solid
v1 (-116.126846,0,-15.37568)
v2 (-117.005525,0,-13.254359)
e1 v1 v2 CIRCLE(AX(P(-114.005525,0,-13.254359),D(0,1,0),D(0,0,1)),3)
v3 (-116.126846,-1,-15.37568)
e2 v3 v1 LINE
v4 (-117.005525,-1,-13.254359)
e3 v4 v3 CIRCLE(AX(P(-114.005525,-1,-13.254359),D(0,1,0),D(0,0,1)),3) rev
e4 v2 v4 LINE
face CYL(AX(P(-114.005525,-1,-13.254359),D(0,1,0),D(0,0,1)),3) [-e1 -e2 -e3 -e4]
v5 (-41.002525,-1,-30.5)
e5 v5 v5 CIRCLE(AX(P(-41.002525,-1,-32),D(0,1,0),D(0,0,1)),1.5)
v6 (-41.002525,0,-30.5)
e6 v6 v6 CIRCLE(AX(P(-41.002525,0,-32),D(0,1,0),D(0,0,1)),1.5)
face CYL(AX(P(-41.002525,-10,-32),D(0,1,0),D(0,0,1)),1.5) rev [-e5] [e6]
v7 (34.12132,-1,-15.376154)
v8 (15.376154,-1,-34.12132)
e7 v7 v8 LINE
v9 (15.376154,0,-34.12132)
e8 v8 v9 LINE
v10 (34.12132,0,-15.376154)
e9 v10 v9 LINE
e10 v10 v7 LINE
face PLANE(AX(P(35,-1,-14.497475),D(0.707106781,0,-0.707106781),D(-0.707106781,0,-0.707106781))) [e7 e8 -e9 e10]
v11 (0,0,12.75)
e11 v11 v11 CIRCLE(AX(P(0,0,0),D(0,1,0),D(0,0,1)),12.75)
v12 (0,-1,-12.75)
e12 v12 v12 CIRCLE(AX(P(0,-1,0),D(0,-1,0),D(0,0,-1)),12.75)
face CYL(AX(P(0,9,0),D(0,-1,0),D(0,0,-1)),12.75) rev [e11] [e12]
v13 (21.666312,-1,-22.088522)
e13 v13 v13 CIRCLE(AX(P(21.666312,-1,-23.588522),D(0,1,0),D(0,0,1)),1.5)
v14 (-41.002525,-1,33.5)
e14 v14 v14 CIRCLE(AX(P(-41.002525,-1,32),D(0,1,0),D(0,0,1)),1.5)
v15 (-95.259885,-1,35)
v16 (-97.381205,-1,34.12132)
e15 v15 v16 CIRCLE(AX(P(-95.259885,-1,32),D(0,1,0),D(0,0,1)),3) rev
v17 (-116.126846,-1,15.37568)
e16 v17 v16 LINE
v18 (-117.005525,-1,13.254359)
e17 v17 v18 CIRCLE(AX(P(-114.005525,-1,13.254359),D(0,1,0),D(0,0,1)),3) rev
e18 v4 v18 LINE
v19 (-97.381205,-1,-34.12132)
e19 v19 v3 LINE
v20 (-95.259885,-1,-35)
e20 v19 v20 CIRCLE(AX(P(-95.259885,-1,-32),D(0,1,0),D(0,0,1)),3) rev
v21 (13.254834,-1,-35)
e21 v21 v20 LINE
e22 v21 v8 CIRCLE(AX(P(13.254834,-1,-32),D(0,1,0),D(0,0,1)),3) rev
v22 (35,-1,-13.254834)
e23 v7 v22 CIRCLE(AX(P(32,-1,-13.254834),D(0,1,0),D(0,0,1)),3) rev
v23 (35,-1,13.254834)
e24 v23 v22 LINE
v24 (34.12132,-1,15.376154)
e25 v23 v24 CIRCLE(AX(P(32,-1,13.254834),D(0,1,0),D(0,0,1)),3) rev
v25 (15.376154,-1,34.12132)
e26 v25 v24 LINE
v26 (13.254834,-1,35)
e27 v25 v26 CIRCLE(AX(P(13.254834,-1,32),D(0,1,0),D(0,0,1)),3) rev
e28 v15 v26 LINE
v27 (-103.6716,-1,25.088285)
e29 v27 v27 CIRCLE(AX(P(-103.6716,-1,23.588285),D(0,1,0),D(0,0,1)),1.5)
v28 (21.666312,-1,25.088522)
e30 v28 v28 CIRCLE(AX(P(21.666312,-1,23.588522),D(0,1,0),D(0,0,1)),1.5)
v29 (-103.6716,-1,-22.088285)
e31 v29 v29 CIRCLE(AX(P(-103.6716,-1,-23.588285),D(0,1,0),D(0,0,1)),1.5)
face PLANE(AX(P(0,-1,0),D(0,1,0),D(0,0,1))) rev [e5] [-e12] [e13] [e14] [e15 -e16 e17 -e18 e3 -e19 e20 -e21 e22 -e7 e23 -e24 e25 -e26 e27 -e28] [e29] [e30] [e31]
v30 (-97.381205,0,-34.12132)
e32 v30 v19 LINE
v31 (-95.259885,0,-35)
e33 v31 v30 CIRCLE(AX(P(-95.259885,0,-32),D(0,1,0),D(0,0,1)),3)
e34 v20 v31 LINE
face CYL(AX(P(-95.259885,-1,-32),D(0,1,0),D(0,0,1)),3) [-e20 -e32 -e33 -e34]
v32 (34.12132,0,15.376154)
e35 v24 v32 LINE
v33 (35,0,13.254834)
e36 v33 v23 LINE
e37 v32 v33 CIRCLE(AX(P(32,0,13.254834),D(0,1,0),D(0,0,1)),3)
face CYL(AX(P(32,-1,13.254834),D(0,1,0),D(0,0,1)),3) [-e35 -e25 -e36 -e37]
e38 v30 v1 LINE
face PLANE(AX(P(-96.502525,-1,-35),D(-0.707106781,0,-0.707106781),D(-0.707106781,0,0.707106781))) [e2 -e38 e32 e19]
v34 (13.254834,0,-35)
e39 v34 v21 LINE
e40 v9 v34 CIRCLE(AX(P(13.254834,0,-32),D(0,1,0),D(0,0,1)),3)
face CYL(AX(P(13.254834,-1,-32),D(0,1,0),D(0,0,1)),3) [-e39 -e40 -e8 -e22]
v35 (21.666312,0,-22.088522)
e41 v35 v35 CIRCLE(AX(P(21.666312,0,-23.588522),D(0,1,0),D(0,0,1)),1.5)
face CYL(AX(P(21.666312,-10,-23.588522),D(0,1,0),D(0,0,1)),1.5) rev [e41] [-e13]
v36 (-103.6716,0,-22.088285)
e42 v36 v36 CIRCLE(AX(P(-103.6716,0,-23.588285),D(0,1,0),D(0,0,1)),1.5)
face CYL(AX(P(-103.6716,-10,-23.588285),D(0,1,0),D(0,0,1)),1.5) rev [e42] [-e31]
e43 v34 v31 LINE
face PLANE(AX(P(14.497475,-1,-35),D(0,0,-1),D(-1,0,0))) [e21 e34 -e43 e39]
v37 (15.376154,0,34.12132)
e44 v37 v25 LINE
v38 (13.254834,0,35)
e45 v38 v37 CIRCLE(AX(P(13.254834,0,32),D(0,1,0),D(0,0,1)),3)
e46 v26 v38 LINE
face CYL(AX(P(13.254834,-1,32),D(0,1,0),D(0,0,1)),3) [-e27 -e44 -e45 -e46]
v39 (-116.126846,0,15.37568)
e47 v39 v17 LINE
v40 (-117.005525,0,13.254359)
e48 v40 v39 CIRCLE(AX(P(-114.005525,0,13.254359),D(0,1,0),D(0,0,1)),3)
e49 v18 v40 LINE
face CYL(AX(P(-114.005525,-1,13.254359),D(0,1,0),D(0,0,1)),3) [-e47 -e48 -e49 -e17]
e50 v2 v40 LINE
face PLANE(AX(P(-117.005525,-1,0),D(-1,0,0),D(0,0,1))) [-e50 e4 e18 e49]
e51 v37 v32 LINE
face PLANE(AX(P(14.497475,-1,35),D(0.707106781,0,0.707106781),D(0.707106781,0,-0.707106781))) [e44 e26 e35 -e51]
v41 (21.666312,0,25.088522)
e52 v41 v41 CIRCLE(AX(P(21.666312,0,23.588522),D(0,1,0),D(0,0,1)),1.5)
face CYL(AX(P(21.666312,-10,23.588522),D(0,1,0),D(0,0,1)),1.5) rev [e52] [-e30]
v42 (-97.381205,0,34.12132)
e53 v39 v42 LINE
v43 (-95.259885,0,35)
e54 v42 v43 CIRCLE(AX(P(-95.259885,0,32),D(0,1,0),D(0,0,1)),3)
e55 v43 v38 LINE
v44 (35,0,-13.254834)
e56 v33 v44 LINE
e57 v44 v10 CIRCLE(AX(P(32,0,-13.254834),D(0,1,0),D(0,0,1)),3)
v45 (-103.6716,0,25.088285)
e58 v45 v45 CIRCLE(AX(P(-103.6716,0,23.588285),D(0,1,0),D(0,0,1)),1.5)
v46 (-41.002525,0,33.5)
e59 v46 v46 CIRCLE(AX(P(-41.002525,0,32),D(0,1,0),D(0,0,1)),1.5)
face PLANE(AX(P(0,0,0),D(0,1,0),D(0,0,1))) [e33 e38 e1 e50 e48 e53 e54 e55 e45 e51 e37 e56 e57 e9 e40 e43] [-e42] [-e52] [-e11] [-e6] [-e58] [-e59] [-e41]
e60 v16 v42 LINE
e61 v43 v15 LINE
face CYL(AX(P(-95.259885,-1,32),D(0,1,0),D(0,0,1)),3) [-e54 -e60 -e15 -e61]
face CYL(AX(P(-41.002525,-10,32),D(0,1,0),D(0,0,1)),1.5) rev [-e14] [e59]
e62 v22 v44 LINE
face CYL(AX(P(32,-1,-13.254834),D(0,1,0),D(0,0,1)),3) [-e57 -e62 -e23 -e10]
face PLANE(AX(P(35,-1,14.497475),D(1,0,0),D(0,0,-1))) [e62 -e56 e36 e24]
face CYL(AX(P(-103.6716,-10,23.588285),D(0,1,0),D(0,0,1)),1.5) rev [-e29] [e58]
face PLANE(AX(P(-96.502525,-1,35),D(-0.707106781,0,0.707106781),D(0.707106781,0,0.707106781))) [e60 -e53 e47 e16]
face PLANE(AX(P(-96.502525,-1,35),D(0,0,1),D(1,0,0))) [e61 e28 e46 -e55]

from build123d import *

# Parameters (mm, degrees)
SM_BASE_FLANGE_1_DEPTH = 1
SKETCH_2_R             = 1.5
CUT_EXTRUDE_1_DEPTH    = 10
FILLET_1_R             = 3
SKETCH_3_R             = 12.75
CUT_EXTRUDE_2_DEPTH    = 10


# Sheet-metal steps are written as plain solids
with BuildPart() as part:
    # Sketch 1 → Базовая кромка1 (new body)
    with BuildSketch(Plane(origin=(0, 0, 0), x_dir=(1, 0, 0), z_dir=(0, 1, 0))):
        Polygon((-96.502525317, -35), (14.497474683, -35), (35, -14.497474683), (35, 14.497474683), (14.497474683, 35), (-96.502525317, 35), (-117.005525317, 14.497), (-117.005525317, 0), (-117.005525317, -14.497), align=None)
    extrude(amount=-SM_BASE_FLANGE_1_DEPTH)

    # Эскиз2 → Вырез-Вытянуть1 (cut)
    with BuildSketch(Plane(origin=(0, 0, 0), x_dir=(1, 0, 0), z_dir=(0, 1, 0))):
        with Locations(Location((-103.671600061, 23.588284569, 0), (0, 0, 270))):
            Circle(SKETCH_2_R)
        with Locations(Location((-41.002525317, 32, 0), (0, 0, 270))):
            Circle(SKETCH_2_R)
        with Locations(Location((21.666312086, 23.58852191, 0), (0, 0, 270))):
            Circle(SKETCH_2_R)
        with Locations(Location((21.666312086, -23.58852191, 0), (0, 0, 270))):
            Circle(SKETCH_2_R)
        with Locations(Location((-103.671600061, -23.588284569, 0), (0, 0, 270))):
            Circle(SKETCH_2_R)
        with Locations(Location((-41.002525317, -32, 0), (0, 0, 270))):
            Circle(SKETCH_2_R)
    extrude(amount=-CUT_EXTRUDE_1_DEPTH, mode=Mode.SUBTRACT)

    # Скругление1
    fillet_1_edges = [part.edges().sort_by_distance(p)[0] for p in [
        (-117.005525317, -0.5, 14.497),
        (-117.005525317, -0.5, -14.497),
        (-96.502525317, -0.5, -35),
        (14.497474683, -0.5, -35),
        (35, -0.5, -14.497474683),
        (35, -0.5, 14.497474683),
        (14.497474683, -0.5, 35),
        (-96.502525317, -0.5, 35),
    ]]
    fillet(fillet_1_edges, radius=FILLET_1_R)

    # Эскиз3 → Вырез-Вытянуть2 (cut)
    with BuildSketch(Plane.XZ.offset(1)):
        with Locations(Location((0, 0, 0), (0, 0, 270))):
            Circle(SKETCH_3_R)
    extrude(amount=-CUT_EXTRUDE_2_DEPTH, mode=Mode.SUBTRACT)


solid = part.part
